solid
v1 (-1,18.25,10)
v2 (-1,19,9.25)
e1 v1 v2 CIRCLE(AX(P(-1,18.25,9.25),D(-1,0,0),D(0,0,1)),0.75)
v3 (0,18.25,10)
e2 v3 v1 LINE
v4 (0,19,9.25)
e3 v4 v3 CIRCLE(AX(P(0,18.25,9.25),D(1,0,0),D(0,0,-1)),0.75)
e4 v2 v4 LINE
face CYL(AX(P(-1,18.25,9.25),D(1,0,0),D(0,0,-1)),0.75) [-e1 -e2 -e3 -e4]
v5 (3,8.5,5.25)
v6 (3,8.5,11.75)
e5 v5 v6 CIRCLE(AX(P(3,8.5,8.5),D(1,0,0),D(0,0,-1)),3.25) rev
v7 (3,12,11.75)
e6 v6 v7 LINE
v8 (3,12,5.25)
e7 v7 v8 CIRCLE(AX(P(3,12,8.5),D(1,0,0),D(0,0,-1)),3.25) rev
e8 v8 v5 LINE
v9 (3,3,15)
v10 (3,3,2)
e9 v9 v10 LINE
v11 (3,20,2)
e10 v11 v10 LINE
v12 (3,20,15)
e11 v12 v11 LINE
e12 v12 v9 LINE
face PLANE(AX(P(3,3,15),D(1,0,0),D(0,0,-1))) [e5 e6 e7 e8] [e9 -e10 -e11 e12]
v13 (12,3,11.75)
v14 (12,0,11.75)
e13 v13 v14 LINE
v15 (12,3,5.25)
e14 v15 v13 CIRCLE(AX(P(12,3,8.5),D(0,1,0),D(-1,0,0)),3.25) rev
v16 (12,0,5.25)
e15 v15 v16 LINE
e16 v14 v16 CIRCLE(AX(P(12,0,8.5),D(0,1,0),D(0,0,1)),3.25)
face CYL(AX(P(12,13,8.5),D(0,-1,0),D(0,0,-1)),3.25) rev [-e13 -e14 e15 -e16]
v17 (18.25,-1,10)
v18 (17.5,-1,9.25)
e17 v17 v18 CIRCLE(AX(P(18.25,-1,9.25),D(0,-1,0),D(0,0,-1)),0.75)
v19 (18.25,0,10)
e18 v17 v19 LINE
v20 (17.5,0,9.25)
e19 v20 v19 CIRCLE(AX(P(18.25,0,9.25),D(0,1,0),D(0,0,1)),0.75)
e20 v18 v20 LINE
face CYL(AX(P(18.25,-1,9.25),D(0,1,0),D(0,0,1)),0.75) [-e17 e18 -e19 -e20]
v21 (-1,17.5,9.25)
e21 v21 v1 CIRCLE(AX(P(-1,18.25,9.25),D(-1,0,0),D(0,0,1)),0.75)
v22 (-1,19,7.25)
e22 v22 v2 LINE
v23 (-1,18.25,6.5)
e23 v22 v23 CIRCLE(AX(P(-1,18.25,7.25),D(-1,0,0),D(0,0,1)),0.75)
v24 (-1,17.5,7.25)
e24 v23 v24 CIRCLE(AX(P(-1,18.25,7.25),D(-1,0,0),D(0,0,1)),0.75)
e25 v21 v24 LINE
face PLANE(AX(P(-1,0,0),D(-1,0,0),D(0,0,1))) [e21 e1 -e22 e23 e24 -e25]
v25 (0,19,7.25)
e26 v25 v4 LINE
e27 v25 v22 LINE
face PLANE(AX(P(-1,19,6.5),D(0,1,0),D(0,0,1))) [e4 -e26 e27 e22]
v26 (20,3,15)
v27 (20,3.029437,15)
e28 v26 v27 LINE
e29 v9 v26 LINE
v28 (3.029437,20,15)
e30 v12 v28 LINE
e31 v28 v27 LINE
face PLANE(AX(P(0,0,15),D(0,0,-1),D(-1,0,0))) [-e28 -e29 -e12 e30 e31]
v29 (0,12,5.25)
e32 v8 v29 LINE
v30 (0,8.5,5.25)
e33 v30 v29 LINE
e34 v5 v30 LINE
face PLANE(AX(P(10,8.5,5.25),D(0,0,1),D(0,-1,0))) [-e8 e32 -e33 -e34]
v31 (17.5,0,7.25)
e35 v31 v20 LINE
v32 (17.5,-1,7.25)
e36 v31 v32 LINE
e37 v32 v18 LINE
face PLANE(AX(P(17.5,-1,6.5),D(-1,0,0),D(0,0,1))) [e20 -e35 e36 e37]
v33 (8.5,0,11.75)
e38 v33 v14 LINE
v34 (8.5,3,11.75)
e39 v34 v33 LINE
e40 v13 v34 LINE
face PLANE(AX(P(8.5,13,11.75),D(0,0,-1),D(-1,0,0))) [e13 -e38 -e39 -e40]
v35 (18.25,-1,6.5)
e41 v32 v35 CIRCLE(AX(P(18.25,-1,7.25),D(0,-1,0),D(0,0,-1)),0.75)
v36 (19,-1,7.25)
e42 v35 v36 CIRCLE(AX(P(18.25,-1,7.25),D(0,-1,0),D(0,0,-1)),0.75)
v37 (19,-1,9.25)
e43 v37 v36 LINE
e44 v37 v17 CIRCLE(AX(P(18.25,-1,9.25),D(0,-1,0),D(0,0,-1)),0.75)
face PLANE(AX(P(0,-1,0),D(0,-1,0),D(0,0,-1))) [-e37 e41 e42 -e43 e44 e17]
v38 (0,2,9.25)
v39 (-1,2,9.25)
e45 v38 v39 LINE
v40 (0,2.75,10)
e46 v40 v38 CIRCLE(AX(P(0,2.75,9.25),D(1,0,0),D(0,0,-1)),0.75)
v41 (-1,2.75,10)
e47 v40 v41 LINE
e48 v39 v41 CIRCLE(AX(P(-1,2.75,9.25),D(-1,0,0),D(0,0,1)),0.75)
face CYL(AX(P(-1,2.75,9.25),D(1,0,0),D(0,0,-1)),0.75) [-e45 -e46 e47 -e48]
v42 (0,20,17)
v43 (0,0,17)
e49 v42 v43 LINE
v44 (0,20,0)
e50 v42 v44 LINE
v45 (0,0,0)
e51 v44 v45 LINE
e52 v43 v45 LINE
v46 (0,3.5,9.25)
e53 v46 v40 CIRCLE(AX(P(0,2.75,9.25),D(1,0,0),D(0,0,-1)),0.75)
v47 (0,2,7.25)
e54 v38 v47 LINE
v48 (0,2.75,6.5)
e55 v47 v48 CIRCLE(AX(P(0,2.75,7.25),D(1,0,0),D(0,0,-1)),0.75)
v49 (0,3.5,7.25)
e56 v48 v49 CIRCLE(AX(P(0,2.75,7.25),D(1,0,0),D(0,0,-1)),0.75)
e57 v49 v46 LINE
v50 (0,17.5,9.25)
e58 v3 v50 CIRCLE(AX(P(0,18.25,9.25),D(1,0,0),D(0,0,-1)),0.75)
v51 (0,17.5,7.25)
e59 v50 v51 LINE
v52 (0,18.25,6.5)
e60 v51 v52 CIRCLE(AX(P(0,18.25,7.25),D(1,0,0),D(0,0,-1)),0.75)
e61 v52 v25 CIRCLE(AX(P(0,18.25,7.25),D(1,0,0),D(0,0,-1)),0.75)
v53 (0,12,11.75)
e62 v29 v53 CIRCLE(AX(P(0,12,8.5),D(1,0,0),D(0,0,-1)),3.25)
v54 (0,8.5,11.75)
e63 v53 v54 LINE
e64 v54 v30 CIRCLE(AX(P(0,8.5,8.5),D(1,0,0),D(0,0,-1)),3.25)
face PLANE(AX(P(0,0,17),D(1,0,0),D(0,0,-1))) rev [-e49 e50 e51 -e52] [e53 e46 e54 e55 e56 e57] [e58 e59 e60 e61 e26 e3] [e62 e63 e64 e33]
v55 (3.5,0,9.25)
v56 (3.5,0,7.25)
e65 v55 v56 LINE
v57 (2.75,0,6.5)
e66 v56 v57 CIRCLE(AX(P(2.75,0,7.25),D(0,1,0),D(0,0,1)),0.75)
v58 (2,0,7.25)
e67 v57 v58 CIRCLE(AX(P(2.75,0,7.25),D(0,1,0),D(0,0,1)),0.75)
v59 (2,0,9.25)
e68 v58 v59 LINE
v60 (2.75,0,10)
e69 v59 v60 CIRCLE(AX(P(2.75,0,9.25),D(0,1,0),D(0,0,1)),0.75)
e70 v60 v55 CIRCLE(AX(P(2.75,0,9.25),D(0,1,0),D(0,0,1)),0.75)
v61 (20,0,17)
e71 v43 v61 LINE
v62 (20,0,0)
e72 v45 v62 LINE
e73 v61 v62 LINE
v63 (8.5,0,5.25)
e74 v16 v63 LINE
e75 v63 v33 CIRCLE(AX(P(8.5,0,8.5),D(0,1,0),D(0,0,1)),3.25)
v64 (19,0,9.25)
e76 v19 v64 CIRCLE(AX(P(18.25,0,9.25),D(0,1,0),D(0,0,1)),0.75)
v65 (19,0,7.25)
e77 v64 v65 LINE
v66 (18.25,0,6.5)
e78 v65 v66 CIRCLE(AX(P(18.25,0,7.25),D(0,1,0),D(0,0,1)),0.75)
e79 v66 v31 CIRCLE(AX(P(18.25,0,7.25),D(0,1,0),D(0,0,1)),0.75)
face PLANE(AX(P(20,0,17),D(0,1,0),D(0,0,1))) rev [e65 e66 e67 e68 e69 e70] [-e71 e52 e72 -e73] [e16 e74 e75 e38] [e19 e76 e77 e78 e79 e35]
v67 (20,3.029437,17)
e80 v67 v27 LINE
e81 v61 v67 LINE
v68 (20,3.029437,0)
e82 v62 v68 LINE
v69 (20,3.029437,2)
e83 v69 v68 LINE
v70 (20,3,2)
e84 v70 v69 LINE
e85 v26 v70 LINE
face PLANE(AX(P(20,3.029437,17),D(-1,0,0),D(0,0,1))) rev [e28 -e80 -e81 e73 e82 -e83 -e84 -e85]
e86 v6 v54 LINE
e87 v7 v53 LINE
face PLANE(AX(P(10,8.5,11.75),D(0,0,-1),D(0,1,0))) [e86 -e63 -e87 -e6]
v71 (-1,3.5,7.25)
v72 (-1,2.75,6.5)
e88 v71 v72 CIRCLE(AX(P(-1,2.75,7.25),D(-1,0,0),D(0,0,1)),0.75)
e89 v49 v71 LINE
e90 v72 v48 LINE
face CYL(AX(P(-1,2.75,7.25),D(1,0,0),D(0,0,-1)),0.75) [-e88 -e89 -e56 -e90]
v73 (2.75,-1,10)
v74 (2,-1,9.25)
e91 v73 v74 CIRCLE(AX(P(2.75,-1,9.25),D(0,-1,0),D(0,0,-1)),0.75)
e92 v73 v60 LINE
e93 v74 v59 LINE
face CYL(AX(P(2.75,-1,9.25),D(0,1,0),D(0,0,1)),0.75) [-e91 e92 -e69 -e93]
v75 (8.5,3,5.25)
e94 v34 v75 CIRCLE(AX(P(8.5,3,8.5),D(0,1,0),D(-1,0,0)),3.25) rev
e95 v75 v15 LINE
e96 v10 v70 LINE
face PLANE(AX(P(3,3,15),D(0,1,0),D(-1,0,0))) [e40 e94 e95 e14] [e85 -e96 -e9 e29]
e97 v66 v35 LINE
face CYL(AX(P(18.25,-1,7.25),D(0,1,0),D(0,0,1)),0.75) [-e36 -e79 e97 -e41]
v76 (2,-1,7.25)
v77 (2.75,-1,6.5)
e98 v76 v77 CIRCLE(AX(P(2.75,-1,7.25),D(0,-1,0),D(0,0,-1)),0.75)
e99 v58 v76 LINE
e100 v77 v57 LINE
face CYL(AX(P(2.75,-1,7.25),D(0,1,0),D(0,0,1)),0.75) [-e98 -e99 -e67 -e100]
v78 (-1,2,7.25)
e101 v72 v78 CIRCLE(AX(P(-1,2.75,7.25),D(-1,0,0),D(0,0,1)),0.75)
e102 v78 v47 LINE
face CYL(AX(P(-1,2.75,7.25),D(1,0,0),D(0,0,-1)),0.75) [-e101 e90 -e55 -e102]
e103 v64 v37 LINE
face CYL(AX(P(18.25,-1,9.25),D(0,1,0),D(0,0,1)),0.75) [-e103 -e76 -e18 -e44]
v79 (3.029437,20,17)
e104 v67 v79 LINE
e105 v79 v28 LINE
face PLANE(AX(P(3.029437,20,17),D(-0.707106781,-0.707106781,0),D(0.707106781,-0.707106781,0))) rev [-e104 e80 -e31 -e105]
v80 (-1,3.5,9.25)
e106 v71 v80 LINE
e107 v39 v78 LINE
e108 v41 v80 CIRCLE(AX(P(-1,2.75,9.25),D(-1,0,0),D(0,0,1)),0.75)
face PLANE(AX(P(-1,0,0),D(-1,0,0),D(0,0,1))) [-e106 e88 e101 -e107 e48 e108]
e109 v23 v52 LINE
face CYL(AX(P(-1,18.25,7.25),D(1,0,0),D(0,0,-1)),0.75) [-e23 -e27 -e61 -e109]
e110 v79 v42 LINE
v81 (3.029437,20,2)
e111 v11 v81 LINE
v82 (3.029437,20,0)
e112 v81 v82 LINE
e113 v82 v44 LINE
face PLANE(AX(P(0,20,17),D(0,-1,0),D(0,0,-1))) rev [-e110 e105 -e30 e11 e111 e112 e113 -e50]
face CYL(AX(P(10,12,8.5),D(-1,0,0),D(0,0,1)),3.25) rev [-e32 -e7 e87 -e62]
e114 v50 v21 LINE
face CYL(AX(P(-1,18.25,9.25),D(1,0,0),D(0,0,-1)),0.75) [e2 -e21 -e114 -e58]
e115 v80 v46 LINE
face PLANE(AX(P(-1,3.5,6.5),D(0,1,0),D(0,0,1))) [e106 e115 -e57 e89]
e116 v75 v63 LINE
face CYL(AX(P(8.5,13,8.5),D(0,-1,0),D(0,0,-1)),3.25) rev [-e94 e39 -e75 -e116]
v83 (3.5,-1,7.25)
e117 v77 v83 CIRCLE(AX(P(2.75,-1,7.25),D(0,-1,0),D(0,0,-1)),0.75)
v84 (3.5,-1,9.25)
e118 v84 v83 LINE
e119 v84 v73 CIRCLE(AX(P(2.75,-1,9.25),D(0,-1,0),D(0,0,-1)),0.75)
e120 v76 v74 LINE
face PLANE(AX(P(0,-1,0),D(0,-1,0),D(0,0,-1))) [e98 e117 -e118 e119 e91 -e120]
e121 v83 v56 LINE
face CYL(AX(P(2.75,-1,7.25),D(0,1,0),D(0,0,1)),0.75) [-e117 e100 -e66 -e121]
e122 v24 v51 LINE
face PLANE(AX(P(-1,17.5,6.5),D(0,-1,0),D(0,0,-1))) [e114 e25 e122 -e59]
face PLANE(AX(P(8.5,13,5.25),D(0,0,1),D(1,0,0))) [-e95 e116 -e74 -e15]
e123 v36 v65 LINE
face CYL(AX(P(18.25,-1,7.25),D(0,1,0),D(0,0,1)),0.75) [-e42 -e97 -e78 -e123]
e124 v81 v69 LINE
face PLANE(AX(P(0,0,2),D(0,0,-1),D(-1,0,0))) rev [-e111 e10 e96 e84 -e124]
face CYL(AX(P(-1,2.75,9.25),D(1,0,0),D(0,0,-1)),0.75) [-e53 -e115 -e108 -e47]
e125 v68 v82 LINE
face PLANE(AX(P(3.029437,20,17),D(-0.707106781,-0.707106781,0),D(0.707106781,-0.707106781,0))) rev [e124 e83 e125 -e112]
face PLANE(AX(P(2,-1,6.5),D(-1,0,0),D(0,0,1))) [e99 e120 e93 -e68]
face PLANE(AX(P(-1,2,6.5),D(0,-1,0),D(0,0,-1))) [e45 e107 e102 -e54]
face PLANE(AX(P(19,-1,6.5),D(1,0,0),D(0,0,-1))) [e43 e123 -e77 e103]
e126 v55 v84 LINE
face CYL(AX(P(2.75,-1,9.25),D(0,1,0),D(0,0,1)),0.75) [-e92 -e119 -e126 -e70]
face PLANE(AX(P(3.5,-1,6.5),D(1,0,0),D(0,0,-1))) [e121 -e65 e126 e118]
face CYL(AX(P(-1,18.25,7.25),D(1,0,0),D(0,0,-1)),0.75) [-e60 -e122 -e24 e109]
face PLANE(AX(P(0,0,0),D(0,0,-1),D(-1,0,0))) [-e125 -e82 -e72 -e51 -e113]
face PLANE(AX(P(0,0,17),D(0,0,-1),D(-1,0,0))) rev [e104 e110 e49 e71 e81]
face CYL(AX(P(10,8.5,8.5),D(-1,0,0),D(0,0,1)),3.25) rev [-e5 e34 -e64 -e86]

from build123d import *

# Parameters (mm, degrees)
BOSS_EXTRUDE1_DEPTH = 17
SKETCH2_W           = 17
SKETCH2_H           = 17
CUT_EXTRUDE1_DEPTH  = 13
CUT_EXTRUDE2_DEPTH  = 13
SKETCH6_W           = 3.5
SKETCH6_H           = 1.5
BOSS_EXTRUDE2_DEPTH = 1
FILLET1_R           = 0.75
SKETCH7_W           = 1.5
SKETCH7_H           = 3.5
BOSS_EXTRUDE3_DEPTH = 1
FILLET2_R           = 0.75
CUT_EXTRUDE3_DEPTH  = 10


with BuildPart() as part:
    # Sketch1 → Boss-Extrude1 (new body)
    with BuildSketch(Plane.XY):
        Polygon((0, 0), (0, 20), (3.029437252, 20), (20, 3.029437252), (20, 0), align=None)
    extrude(amount=BOSS_EXTRUDE1_DEPTH)

    # Sketch2 → Cut-Extrude1 (cut)
    with BuildSketch(Plane.XY.offset(2)):
        with Locations((11.5, 11.5)):
            Rectangle(SKETCH2_W, SKETCH2_H)
    extrude(amount=CUT_EXTRUDE1_DEPTH, mode=Mode.SUBTRACT)

    # Sketch3 → Cut-Extrude2 (cut)
    with BuildSketch(Plane(origin=(0, 0, 0), x_dir=(1, 0, 0), z_dir=(0, 1, 0))):
        with BuildLine():
            Line((8.5, -5.25), (12, -5.25))
            ThreePointArc((12, -5.25), (15.25, -8.5), (12, -11.75))
            Line((12, -11.75), (8.5, -11.75))
            ThreePointArc((8.5, -11.75), (5.25, -8.5), (8.5, -5.25))
        make_face()
    extrude(amount=CUT_EXTRUDE2_DEPTH, mode=Mode.SUBTRACT)

    # Sketch6 → Boss-Extrude2 (add)
    with BuildSketch(Plane(origin=(0, 0, 0), x_dir=(0, 0, -1), z_dir=(1, 0, 0))):
        with Locations((-8.25, 18.25)):
            Rectangle(SKETCH6_W, SKETCH6_H)
        with Locations((-8.25, 2.75)):
            Rectangle(SKETCH6_W, SKETCH6_H)
    extrude(amount=-BOSS_EXTRUDE2_DEPTH)

    # Fillet1
    fillet1_edges = [part.edges().sort_by_distance(p)[0] for p in [
        (-0.5, 2, 6.5),
        (-0.5, 17.5, 6.5),
        (-0.5, 2, 10),
        (-0.5, 3.5, 10),
        (-0.5, 3.5, 6.5),
        (-0.5, 17.5, 10),
        (-0.5, 19, 10),
        (-0.5, 19, 6.5),
    ]]
    fillet(fillet1_edges, radius=FILLET1_R - 0.0001)  # a hair under: the kernel refuses the full size

    # Sketch7 → Boss-Extrude3 (add)
    with BuildSketch(Plane(origin=(0, 0, 0), x_dir=(1, 0, 0), z_dir=(0, 1, 0))):
        with Locations((2.75, -8.25)):
            Rectangle(SKETCH7_W, SKETCH7_H)
        with Locations((18.25, -8.25)):
            Rectangle(SKETCH7_W, SKETCH7_H)
    extrude(amount=-BOSS_EXTRUDE3_DEPTH)

    # Fillet2
    fillet2_edges = [part.edges().sort_by_distance(p)[0] for p in [
        (3.5, -0.5, 6.5),
        (2, -0.5, 6.5),
        (2, -0.5, 10),
        (3.5, -0.5, 10),
        (17.5, -0.5, 10),
        (19, -0.5, 10),
        (17.5, -0.5, 6.5),
        (19, -0.5, 6.5),
    ]]
    fillet(fillet2_edges, radius=FILLET2_R - 0.0001)  # a hair under: the kernel refuses the full size

    # Sketch8 → Cut-Extrude3 (cut)
    with BuildSketch(Plane(origin=(0, 0, 0), x_dir=(0, 0, -1), z_dir=(1, 0, 0))):
        with BuildLine():
            Line((-11.75, 8.5), (-11.75, 12))
            ThreePointArc((-11.75, 12), (-8.5, 15.25), (-5.25, 12))
            Line((-5.25, 12), (-5.25, 8.5))
            ThreePointArc((-5.25, 8.5), (-8.5, 5.25), (-11.75, 8.5))
        make_face()
    extrude(amount=CUT_EXTRUDE3_DEPTH, mode=Mode.SUBTRACT)


solid = part.part
